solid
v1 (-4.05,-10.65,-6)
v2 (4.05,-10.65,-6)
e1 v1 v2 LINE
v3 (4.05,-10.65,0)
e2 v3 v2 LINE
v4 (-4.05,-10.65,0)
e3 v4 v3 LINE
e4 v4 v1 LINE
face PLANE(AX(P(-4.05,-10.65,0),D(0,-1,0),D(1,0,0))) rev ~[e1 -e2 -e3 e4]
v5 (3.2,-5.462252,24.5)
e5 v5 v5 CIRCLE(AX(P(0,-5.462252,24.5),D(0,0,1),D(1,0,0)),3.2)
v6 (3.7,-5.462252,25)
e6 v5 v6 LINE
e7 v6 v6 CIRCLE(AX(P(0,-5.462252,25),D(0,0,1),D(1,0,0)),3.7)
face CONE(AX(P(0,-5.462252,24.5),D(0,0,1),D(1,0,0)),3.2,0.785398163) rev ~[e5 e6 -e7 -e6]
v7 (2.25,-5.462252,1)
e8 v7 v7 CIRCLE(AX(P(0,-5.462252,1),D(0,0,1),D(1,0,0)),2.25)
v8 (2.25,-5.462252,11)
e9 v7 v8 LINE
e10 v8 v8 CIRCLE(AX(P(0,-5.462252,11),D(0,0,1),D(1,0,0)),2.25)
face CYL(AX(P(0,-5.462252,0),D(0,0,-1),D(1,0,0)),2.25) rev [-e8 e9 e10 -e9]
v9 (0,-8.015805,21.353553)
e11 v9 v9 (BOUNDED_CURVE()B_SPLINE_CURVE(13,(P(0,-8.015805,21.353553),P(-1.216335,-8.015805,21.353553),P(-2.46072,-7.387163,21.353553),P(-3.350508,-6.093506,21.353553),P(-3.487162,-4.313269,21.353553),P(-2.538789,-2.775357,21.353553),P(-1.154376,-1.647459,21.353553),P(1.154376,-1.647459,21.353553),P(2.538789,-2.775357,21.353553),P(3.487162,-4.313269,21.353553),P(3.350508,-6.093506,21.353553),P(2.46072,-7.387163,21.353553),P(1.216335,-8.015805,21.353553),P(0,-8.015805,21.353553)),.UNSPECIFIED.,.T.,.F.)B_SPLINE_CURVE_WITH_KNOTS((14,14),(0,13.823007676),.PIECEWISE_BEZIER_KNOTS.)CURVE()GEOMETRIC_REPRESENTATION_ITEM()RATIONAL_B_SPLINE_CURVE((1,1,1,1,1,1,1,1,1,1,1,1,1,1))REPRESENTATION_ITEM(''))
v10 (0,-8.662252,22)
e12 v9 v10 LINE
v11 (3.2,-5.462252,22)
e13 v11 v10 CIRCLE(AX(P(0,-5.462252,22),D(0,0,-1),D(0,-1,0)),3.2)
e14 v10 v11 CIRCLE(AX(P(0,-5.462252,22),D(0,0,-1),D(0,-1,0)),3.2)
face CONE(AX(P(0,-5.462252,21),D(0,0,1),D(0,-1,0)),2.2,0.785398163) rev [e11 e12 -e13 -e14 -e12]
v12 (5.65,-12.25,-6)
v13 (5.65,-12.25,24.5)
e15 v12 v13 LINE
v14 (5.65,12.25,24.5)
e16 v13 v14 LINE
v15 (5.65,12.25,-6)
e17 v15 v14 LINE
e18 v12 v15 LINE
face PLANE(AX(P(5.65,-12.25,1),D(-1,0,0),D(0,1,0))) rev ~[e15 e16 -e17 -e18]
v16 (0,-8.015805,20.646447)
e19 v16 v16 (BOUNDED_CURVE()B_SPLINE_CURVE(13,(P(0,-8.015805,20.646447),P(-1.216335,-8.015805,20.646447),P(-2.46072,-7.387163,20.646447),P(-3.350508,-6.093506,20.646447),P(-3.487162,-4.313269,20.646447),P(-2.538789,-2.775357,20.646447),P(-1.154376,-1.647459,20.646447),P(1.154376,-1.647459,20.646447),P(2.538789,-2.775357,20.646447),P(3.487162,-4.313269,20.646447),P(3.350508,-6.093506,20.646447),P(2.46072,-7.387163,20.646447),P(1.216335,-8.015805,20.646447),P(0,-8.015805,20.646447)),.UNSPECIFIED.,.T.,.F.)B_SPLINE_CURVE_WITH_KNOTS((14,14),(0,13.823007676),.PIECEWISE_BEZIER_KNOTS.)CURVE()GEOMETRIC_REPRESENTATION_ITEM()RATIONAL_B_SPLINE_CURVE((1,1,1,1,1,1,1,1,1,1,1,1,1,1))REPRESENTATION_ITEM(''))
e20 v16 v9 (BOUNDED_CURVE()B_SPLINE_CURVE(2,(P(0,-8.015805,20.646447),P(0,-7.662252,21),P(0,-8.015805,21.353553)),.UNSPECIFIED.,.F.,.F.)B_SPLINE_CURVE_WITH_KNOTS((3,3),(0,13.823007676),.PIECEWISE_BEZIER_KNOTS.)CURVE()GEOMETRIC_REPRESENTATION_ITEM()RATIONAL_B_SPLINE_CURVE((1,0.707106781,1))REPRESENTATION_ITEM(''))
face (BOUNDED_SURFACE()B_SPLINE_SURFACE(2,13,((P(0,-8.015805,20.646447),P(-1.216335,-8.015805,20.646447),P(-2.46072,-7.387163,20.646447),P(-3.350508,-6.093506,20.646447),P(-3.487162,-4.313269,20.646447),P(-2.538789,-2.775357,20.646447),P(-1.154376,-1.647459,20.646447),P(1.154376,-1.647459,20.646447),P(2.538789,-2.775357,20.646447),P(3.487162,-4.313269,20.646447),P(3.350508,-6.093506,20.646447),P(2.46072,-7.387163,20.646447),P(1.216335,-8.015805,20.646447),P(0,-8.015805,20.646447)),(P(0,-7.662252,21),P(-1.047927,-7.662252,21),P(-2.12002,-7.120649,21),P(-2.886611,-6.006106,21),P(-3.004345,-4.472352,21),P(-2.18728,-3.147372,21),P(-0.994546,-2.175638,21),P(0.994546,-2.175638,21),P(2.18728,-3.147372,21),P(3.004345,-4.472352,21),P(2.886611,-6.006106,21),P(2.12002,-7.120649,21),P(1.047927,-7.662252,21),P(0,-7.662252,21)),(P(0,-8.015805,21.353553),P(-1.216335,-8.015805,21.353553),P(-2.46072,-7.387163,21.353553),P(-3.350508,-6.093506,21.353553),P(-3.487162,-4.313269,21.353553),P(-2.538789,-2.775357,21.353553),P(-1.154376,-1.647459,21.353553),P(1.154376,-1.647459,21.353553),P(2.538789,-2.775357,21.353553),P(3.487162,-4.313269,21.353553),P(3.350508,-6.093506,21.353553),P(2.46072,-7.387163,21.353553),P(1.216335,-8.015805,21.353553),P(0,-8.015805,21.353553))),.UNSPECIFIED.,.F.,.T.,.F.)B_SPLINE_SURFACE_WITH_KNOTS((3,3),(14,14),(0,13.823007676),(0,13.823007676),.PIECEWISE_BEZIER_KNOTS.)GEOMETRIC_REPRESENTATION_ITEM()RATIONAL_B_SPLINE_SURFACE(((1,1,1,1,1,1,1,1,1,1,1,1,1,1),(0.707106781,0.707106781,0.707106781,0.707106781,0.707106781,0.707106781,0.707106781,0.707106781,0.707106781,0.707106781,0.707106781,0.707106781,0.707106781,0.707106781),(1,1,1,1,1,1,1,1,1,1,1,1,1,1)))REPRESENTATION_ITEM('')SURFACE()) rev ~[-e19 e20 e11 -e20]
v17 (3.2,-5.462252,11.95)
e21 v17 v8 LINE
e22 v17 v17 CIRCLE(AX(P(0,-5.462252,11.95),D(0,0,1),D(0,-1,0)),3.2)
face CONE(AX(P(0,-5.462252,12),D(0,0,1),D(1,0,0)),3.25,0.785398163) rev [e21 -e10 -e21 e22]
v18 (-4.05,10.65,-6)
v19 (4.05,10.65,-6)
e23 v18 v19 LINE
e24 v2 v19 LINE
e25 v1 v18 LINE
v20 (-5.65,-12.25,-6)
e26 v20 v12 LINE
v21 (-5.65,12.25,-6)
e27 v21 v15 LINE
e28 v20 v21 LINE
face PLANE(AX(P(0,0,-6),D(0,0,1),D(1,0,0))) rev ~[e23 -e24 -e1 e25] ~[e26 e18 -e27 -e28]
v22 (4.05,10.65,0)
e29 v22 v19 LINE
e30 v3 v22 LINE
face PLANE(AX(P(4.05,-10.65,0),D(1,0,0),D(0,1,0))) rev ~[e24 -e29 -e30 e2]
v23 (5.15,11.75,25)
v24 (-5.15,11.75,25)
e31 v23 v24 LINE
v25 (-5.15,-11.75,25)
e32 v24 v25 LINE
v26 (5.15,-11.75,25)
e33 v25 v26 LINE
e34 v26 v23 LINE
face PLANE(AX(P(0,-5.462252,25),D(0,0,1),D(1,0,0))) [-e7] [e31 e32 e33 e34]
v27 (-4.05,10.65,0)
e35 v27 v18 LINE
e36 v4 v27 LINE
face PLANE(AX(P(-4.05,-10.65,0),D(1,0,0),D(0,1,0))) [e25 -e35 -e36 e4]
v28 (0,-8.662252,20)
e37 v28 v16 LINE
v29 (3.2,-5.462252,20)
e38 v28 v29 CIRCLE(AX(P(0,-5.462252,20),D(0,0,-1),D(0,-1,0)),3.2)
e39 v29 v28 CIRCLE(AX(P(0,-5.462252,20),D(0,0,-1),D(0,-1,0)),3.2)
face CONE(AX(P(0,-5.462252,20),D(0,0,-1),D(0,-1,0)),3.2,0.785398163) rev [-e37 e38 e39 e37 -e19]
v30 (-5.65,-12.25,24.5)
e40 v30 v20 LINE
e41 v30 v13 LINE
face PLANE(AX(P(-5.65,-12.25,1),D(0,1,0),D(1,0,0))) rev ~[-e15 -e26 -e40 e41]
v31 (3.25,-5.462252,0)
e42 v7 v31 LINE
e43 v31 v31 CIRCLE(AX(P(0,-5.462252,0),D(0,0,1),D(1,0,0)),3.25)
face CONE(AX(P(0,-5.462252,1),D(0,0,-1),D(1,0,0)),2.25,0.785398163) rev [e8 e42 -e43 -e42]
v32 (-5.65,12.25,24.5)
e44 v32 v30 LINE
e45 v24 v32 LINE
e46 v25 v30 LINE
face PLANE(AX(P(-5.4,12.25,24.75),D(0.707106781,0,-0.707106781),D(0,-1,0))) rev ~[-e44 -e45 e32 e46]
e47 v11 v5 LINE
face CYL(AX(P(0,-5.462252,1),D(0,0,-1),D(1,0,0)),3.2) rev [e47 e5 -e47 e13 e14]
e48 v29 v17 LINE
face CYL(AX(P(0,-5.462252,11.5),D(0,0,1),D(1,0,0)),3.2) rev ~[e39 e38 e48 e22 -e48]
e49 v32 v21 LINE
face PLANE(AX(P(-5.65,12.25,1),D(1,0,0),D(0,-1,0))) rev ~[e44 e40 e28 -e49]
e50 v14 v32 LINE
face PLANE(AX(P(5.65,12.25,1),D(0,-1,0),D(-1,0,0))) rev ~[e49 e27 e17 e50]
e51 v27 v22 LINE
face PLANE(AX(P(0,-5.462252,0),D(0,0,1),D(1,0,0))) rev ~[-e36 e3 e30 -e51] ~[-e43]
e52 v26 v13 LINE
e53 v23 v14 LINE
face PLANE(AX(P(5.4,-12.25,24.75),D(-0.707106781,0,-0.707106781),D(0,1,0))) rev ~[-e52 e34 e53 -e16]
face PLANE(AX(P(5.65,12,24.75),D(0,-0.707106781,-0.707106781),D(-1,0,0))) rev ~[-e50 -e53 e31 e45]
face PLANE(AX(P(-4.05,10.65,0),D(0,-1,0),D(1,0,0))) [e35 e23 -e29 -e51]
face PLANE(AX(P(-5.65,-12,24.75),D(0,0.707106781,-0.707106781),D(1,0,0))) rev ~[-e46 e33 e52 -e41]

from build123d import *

# Parameters (mm, degrees)
F0_W         = 11.3
F0_H         = 24.5
F0_W_2       = 8.1
F0_H_2       = 21.3
F1_DEPTH     = 1
F2_DEPTH     = 6
F3_R         = 3.2
F4_DEPTH     = 24
F5_DEPTH     = 28.9
F8_R         = 0.5
F9_SIZE      = 0.5
F10_R        = 3.2
F10_R_2      = 2.25
F11_DEPTH    = 12
F12_S5_R     = 3.2
F12_T6_DEPTH = 6
F13_SIZE     = 1


# Not quite as in the source:
# - a fillet or chamfer that OpenCascade refuses, or shapes differently, is made with other operations: its cross-section is extruded or revolved along the edge and cut away or added


with BuildPart() as f1:
    # F0 (on Top) → F1 (new body)
    with BuildSketch(Plane.XY):
        Rectangle(F0_W, F0_H)
        Rectangle(F0_W_2, F0_H_2, mode=Mode.SUBTRACT)
        Rectangle(F0_W_2, F0_H_2)
    extrude(amount=F1_DEPTH)

    # F0 (on Top) → F2 (join)
    with BuildSketch(Plane.XY):
        Rectangle(F0_W, F0_H)
        Rectangle(F0_W_2, F0_H_2, mode=Mode.SUBTRACT)
    extrude(amount=-F2_DEPTH)

    # F3 (on face) → F4 (join)
    with BuildSketch(Plane.XY.offset(1)):
        with BuildLine():
            ThreePointArc((-5.65, -5.4622520893), (1e-08, -11.1122520693), (5.65, -5.4622520693))
            ThreePointArc((5.65, -5.4622520693), (-1e-08, 0.1877479307), (-5.65, -5.4622520893))
        make_face()
        with Locations((0, -5.4622520693)):
            Circle(F3_R, mode=Mode.SUBTRACT)
        with BuildLine():
            Line((5.65, -12.25), (5.65, -5.4622520693))
            ThreePointArc((5.65, -5.4622520693), (1e-08, -11.1122520693), (-5.65, -5.4622520893))
            Line((-5.65, -5.4622520893), (-5.65, -12.25))
            Line((-5.65, -12.25), (5.65, -12.25))
        make_face()
        with BuildLine():
            ThreePointArc((-5.65, -5.4622520893), (-1e-08, 0.1877479307), (5.65, -5.4622520693))
            Line((5.65, -5.4622520693), (5.65, 12.25))
            Line((5.65, 12.25), (-5.65, 12.25))
            Line((-5.65, 12.25), (-5.65, -5.4622520893))
        make_face()
    extrude(amount=F4_DEPTH)

    # F5 (cut): a face of the model
    f5_faces = [f1.faces().sort_by_distance(p)[0] for p in [
        (0, -5.4622520693, 1),
    ]]
    extrude(f5_faces, amount=-F5_DEPTH, mode=Mode.SUBTRACT)

    # F6 (on Right) → F7 (revolve)
    with BuildSketch(Plane.YZ):
        Polygon((-8.6622520693, 22), (-8.6622520693, 20), (-7.6622520693, 21), align=None)
    revolve(axis=Axis((0, -5.4622520693, 1), (0, 0, -1)))

    # F8
    f8_edges = [f1.edges().sort_by_distance(p)[0] for p in [
        (0, -3.262252, 21),
    ]]
    fillet(f8_edges, radius=F8_R)

    # F9
    f9_edges = [f1.edges().sort_by_distance(p)[0] for p in [
        (-5.65, 0, 25),
        (0, -12.25, 25),
        (5.65, 0, 25),
        (0, 12.25, 25),
        (-3.2, -5.462252, 25),
    ]]
    chamfer(f9_edges, length=F9_SIZE)

    # F10 (on face) → F11 (join)
    with BuildSketch(Plane.XY):
        with Locations((0, -5.4622520693)):
            Circle(F10_R)
        with Locations((0, -5.4622520693)):
            Circle(F10_R_2, mode=Mode.SUBTRACT)
    extrude(amount=F11_DEPTH)

    # F12: chamfer of 1 on 1 edges, made by hand


with BuildPart() as f12_tool2:
    # F12_s3 → F12_t4 (revolve)
    with BuildSketch(Plane.XZ.offset(5.4622520693)):
        Polygon((3.25, 12), (2.25, 11), (2.25, 12), align=None)
    revolve(axis=Axis((0, -5.4622520693, 12), (0, 0, 1)))

    # F12_s5 → F12_t6 (intersect, symmetric)
    with BuildSketch(Plane.XY.offset(11.5)):
        with Locations((0, -5.4622520693)):
            Circle(F12_S5_R)
    extrude(amount=F12_T6_DEPTH, both=True, mode=Mode.INTERSECT)


with BuildPart() as f1_1:
    add(f1.part)

    # F12_t1: cut F12_tool2
    add(f12_tool2.part, mode=Mode.SUBTRACT)

    # F13
    f13_edges = [f1_1.edges().sort_by_distance(p)[0] for p in [
        (-2.25, -5.462252, 0),
    ]]
    chamfer(f13_edges, length=F13_SIZE)


solid = f1_1.part
